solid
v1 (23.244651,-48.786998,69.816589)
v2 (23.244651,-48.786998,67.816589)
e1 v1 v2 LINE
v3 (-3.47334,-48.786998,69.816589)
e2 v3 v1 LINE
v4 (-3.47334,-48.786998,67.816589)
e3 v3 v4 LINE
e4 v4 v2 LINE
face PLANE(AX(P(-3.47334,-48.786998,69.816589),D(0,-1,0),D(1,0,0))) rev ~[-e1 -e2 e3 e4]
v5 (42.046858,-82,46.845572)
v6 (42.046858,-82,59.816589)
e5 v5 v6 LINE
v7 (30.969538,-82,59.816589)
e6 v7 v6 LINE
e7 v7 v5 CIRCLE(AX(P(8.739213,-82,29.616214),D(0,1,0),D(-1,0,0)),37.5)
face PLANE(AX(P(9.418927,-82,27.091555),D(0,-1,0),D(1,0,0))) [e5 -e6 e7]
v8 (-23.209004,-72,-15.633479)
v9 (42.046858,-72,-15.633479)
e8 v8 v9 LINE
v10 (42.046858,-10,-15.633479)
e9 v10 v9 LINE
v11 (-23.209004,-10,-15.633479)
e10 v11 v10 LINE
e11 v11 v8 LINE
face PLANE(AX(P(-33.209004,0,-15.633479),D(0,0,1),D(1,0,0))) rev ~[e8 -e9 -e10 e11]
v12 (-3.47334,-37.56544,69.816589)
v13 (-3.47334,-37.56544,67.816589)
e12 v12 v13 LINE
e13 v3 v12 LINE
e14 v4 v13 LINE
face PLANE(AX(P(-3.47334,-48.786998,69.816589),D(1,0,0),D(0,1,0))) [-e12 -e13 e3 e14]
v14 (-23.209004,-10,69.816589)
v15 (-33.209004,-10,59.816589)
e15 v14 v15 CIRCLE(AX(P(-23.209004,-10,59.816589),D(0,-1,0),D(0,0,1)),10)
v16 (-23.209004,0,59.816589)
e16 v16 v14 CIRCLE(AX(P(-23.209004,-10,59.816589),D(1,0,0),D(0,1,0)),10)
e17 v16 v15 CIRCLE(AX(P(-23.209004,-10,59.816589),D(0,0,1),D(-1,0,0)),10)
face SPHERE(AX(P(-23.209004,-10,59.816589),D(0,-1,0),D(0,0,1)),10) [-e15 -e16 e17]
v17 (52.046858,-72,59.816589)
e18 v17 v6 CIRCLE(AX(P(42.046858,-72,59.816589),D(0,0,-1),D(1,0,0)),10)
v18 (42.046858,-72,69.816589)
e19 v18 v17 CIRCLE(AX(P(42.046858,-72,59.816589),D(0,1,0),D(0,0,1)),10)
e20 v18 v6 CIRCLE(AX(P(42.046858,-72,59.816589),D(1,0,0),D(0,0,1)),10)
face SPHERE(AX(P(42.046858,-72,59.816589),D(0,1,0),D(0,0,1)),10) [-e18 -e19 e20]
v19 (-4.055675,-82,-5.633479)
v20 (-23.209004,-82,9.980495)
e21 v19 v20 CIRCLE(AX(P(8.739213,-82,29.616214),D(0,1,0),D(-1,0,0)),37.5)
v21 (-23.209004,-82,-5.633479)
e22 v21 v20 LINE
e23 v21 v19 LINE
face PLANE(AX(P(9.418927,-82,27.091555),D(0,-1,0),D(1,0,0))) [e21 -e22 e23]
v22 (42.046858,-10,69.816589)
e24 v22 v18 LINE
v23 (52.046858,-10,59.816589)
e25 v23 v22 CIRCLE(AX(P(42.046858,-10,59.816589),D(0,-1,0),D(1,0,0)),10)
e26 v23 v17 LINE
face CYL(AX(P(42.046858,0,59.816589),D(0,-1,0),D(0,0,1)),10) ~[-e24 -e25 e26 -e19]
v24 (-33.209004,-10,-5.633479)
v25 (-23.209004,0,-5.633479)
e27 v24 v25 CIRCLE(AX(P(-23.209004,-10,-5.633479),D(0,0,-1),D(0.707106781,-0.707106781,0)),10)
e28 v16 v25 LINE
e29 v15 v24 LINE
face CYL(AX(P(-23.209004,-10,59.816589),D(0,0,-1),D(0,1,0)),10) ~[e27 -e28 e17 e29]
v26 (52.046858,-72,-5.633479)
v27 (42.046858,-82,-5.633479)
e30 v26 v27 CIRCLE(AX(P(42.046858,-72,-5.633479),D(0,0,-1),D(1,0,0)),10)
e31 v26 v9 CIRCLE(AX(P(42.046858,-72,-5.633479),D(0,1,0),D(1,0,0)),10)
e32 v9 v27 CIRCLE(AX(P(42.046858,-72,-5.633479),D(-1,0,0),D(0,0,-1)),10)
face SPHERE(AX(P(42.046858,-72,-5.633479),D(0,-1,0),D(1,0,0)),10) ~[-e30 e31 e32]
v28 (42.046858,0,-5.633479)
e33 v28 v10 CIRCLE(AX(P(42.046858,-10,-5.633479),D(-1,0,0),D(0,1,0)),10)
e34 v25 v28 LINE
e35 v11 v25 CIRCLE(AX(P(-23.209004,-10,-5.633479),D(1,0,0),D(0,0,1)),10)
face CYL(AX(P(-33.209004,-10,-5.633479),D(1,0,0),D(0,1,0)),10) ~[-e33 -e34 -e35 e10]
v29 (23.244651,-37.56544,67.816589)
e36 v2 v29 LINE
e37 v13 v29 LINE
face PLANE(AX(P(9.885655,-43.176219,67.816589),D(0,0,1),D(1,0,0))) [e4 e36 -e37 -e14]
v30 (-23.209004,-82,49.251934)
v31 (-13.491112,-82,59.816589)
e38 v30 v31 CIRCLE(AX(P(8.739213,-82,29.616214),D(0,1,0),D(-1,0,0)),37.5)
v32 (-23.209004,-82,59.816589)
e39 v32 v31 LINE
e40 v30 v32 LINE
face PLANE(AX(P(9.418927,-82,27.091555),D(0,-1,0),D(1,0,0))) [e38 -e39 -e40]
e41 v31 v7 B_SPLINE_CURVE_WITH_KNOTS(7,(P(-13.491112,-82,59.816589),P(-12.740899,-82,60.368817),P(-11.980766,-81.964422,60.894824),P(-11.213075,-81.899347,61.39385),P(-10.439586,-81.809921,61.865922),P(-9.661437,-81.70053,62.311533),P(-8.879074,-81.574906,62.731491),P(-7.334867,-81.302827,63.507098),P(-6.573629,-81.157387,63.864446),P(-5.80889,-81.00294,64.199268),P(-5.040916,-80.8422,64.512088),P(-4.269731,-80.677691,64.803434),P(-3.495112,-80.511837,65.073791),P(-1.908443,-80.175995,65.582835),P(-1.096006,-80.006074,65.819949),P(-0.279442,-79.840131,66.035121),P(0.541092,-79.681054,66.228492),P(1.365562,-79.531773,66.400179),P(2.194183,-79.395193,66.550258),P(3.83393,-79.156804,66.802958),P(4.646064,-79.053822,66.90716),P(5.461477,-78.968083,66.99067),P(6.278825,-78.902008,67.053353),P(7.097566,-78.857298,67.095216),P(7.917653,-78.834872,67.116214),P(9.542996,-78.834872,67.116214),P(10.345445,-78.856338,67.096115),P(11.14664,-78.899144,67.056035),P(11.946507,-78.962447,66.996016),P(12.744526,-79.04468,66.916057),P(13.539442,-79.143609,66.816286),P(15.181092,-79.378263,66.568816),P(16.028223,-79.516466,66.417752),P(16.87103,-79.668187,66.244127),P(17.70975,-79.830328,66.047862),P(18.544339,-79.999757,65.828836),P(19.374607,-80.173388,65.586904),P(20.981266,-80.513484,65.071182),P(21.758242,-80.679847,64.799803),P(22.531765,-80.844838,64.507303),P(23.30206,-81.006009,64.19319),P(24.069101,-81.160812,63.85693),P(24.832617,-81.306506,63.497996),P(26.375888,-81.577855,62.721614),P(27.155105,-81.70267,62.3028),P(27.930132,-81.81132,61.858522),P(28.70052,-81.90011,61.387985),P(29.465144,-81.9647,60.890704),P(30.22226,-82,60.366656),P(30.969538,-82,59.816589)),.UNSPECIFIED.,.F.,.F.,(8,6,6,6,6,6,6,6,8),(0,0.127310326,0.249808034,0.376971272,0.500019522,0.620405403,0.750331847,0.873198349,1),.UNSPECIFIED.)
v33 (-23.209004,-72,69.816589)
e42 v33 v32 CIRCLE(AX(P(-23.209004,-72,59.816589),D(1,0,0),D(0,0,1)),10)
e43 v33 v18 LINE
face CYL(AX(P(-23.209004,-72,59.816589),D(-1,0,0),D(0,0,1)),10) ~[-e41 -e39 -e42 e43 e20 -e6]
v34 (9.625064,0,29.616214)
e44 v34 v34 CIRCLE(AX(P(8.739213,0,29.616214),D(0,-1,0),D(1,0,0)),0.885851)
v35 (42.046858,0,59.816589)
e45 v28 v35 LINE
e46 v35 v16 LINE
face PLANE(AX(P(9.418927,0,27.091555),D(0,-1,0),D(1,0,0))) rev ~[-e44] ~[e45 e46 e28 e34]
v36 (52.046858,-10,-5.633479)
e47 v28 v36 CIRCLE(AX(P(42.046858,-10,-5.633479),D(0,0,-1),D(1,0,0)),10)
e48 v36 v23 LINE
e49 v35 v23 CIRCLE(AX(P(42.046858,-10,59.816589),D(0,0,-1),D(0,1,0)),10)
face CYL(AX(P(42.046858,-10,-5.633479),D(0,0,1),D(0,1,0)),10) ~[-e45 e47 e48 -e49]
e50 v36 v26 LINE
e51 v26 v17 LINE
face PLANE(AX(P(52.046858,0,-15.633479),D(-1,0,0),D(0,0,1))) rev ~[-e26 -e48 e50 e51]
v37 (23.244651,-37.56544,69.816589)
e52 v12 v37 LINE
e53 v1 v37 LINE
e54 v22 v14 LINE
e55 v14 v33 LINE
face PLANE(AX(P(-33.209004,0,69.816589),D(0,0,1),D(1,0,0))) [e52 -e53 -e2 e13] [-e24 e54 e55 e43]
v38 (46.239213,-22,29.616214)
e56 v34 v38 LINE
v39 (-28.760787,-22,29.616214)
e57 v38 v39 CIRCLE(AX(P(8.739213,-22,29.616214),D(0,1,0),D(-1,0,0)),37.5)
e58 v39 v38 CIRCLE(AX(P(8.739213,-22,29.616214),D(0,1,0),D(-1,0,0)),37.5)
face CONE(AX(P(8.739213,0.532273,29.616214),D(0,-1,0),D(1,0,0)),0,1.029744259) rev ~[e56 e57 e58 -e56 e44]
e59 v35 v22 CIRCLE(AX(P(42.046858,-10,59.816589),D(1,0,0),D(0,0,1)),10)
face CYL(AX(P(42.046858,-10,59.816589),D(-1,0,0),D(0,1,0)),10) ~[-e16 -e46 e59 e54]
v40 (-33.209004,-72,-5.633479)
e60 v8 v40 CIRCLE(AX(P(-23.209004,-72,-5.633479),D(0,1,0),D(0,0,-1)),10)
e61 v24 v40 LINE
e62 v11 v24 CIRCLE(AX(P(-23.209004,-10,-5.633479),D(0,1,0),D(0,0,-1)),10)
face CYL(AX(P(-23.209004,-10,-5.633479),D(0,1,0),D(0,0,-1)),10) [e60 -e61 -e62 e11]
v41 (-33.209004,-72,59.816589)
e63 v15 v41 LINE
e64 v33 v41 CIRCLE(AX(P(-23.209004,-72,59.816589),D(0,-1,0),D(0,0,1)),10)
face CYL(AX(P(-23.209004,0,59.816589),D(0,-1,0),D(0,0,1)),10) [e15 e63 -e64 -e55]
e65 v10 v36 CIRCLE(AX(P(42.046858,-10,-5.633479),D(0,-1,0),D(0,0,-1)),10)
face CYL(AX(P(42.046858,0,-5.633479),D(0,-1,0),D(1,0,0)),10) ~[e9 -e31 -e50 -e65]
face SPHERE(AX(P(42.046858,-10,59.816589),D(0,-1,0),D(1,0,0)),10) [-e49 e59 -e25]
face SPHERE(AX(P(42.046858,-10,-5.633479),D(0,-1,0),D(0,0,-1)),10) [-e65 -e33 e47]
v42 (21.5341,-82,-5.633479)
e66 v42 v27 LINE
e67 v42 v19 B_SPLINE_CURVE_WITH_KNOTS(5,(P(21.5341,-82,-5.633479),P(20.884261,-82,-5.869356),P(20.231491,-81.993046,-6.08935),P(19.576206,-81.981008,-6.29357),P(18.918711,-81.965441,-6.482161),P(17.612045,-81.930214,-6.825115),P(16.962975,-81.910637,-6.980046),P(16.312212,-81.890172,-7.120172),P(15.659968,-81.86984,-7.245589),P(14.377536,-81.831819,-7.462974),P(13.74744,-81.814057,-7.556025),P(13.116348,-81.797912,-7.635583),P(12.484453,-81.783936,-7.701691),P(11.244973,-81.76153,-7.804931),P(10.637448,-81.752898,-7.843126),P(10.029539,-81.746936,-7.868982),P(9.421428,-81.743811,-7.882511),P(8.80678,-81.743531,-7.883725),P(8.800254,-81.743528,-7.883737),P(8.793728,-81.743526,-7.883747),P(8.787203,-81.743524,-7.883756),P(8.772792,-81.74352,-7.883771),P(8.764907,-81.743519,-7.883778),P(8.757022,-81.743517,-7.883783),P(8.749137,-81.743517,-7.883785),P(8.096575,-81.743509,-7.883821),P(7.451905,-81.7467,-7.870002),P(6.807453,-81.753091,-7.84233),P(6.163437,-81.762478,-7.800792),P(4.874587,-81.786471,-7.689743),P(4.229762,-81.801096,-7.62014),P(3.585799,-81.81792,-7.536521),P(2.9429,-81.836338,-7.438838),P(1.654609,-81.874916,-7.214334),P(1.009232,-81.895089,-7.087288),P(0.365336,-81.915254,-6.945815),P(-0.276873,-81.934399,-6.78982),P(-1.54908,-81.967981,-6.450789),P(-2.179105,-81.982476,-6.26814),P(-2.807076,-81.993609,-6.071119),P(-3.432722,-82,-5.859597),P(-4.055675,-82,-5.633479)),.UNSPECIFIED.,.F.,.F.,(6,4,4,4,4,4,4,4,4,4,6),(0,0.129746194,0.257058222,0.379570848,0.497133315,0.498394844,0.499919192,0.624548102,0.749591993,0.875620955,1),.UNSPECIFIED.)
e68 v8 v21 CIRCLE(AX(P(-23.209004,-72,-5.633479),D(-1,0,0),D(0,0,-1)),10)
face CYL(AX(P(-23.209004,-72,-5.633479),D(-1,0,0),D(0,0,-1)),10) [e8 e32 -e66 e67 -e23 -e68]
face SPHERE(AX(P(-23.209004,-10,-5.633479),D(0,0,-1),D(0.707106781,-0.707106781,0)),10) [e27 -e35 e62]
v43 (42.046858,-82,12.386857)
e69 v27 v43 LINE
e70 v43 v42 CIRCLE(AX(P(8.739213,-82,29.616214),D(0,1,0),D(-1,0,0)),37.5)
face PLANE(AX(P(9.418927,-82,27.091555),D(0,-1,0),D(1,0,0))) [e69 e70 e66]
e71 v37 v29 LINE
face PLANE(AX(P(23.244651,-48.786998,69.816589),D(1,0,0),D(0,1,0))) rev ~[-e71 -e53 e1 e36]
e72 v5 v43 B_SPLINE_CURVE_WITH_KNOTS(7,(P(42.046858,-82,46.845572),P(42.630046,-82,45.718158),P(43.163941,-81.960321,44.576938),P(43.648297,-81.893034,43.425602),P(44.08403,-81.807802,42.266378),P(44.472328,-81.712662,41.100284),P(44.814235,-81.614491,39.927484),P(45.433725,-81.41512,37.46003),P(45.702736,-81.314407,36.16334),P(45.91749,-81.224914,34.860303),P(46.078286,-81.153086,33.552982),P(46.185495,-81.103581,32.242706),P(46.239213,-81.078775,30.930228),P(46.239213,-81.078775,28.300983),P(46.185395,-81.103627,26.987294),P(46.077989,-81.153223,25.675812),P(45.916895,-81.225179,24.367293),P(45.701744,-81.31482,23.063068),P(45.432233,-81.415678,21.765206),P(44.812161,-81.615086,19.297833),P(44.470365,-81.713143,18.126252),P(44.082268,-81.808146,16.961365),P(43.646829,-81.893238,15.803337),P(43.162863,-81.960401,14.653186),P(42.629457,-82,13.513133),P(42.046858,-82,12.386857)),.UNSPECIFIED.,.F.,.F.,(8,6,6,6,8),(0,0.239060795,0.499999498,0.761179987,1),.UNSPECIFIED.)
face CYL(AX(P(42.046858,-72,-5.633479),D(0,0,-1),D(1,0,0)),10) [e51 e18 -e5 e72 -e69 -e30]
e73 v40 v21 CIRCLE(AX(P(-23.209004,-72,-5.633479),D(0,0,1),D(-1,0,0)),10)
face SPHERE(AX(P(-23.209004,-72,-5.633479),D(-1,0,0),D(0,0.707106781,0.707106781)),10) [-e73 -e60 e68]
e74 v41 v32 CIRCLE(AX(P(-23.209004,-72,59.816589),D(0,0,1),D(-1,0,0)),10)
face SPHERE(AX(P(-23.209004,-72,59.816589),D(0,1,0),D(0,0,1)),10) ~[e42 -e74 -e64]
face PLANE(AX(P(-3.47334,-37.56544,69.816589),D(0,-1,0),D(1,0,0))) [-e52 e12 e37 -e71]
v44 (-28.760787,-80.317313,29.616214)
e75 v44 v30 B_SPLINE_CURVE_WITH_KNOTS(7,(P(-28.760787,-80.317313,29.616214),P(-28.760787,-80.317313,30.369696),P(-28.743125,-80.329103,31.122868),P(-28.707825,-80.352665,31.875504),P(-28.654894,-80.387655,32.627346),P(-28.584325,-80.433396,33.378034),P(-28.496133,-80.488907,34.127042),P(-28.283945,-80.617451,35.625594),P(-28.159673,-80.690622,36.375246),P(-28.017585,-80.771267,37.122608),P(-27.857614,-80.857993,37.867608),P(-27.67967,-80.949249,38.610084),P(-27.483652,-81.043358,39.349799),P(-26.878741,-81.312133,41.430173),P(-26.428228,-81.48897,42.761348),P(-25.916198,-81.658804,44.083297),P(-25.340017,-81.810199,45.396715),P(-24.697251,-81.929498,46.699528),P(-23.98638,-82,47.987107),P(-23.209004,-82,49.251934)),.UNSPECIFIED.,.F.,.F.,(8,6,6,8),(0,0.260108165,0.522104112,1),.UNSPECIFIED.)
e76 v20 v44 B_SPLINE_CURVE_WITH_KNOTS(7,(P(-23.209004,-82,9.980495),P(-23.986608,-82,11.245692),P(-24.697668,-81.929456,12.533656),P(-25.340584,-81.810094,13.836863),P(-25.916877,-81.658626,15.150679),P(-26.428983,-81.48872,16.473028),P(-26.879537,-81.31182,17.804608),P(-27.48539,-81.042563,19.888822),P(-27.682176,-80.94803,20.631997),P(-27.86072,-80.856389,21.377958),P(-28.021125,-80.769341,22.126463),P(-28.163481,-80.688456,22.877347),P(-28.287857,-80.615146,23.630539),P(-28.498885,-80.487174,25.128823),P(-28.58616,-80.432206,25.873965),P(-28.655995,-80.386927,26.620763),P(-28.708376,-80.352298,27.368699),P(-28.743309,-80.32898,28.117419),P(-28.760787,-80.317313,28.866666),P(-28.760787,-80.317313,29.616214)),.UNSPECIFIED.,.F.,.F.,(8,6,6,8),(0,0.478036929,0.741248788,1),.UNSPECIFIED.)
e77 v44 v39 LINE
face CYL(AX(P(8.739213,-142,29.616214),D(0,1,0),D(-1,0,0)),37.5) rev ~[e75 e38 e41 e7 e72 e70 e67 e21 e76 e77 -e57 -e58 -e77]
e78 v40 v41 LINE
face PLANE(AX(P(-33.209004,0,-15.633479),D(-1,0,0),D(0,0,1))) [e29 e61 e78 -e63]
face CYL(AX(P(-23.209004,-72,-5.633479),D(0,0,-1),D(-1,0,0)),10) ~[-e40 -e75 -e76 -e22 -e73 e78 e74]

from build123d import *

# Parameters (mm, degrees)
F0_W         = 85.2558612823
F0_H         = 85.4500681162
F1_DEPTH     = 82
F3_D         = 75
F3_DEPTH     = 60
F3_TIP       = 22.5322732135
F4_R         = 10
F5_R         = 10
F6_R         = 10
F7_R         = 10
F8_T1_DEPTH  = 62
F8_T3_DEPTH  = 65.2558612823
F8_T5_DEPTH  = 65.4500681162
F8_S9_W      = 10
F8_S9_H      = 10
F8_T10_DEPTH = 10
F8_S15_W     = 10
F8_S15_H     = 10
F8_T16_DEPTH = 10
F8_T20_ANGLE = 90
F8_T22_ANGLE = 90
F8_T24_ANGLE = 90
F9_W         = 26.7179913353
F9_H         = 11.2215578556
F10_DEPTH    = 2


# Not quite as in the source:
# - a fillet or chamfer that OpenCascade refuses, or shapes differently, is made with other operations: its cross-section is extruded or revolved along the edge and cut away or added


with BuildPart() as f1:
    # F0 (on Front) → F1 (new body)
    with BuildSketch(Plane.XZ):
        with Locations((9.4189271331, 27.0915552974)):
            Rectangle(F0_W, F0_H)
    extrude(amount=F1_DEPTH)

    # F3
    with Locations(Plane.XZ.offset(82)):
        with Locations((8.7392125279, 29.616214335)):
            Hole(F3_D / 2, depth=F3_DEPTH)
            with Locations((0, 0, -(F3_DEPTH + F3_TIP / 2))):  # 118° drill point
                Cone(0, F3_D / 2, F3_TIP, mode=Mode.SUBTRACT)

    # F4
    f4_edges = [f1.edges().sort_by_distance(p)[0] for p in [
        (52.046858, -41, 69.816589),
    ]]
    fillet(f4_edges, radius=F4_R)

    # F5
    f5_edges = [f1.edges().sort_by_distance(p)[0] for p in [
        (-33.209004, -41, 69.816589),
    ]]
    fillet(f5_edges, radius=F5_R)

    # F6
    f6_edges = [f1.edges().sort_by_distance(p)[0] for p in [
        (52.046858, -41, -15.633479),
    ]]
    fillet(f6_edges, radius=F6_R)

    # F7
    f7_edges = [f1.edges().sort_by_distance(p)[0] for p in [
        (4.418927, 0, -15.633479),
    ]]
    fillet(f7_edges, radius=F7_R)

    # F8: fillet of radius 10 on 2 edges, made by hand

    # F8_s2 → F8_t1 (cut)
    with BuildSketch(Plane.XZ.offset(10)):
        with BuildLine():
            ThreePointArc((-23.2090035081, -15.6334787607), (-30.28007132, -12.7045465726), (-33.2090035081, -5.6334787607))
            Line((-33.2090035081, -5.6334787607), (-33.2090035081, -15.6334787607))
            Line((-33.2090035081, -15.6334787607), (-23.2090035081, -15.6334787607))
        make_face()
    extrude(amount=F8_T1_DEPTH, mode=Mode.SUBTRACT)

    # F8_s4 → F8_t3 (cut)
    with BuildSketch(Plane.YZ.offset(-23.2090035081)):
        with BuildLine():
            ThreePointArc((-72, 69.8165893555), (-79.0710678119, 66.8876571673), (-82, 59.8165893555))
            Line((-82, 59.8165893555), (-82, 69.8165893555))
            Line((-82, 69.8165893555), (-72, 69.8165893555))
        make_face()
        with BuildLine():
            ThreePointArc((-72, -15.6334787607), (-79.0710678119, -12.7045465726), (-82, -5.6334787607))
            Line((-82, -5.6334787607), (-82, -15.6334787607))
            Line((-82, -15.6334787607), (-72, -15.6334787607))
        make_face()
    extrude(amount=F8_T3_DEPTH, mode=Mode.SUBTRACT)

    # F8_s6 → F8_t5 (cut)
    with BuildSketch(Plane.XY.offset(-5.6334787607)):
        with BuildLine():
            ThreePointArc((-33.2090035081, -72), (-30.28007132, -79.0710678119), (-23.2090035081, -82))
            Line((-23.2090035081, -82), (-33.2090035081, -82))
            Line((-33.2090035081, -82), (-33.2090035081, -72))
        make_face()
        with BuildLine():
            ThreePointArc((52.0468577743, -72), (49.1179255861, -79.0710678119), (42.0468577743, -82))
            Line((42.0468577743, -82), (52.0468577743, -82))
            Line((52.0468577743, -82), (52.0468577743, -72))
        make_face()
    extrude(amount=F8_T5_DEPTH, mode=Mode.SUBTRACT)


with BuildPart() as f8_tool8:
    # F8_s9 → F8_t10 (new body)
    with BuildSketch(Plane.XY.offset(-5.6334787607)):
        with Locations((-28.2090035081, -5)):
            Rectangle(F8_S9_W, F8_S9_H)
    extrude(amount=-F8_T10_DEPTH)

    # F8_s11 → F8_t12 (revolve, cut)
    with BuildSketch(Plane(origin=(-23.2090035081, -10, -5.6334787607), x_dir=(0.7071067812, -0.7071067812, 0), z_dir=(0.7071067812, 0.7071067812, 0))):
        with BuildLine():
            ThreePointArc((0, -10), (10, 0), (0, 10))
            Line((0, 10), (0, -10))
        make_face()
    revolve(axis=Axis((-23.2090035081, -10, -5.6334787607), (0, 0, -1)), mode=Mode.SUBTRACT)


with BuildPart() as f1_1:
    add(f1.part)

    # F8_t7: cut F8_tool8
    add(f8_tool8.part, mode=Mode.SUBTRACT)


with BuildPart() as f8_tool14:
    # F8_s15 → F8_t16 (new body)
    with BuildSketch(Plane.YZ.offset(-23.2090035081)):
        with Locations((-77, -10.6334787607)):
            Rectangle(F8_S15_W, F8_S15_H)
    extrude(amount=-F8_T16_DEPTH)

    # F8_s17 → F8_t18 (revolve, cut)
    with BuildSketch(Plane(origin=(-23.2090035081, -72, -5.6334787607), x_dir=(0, 0.7071067812, 0.7071067812), z_dir=(0, -0.7071067812, 0.7071067812))):
        with BuildLine():
            ThreePointArc((0, -10), (10, 0), (0, 10))
            Line((0, 10), (0, -10))
        make_face()
    revolve(axis=Axis((-23.2090035081, -72, -5.6334787607), (-1, 0, 0)), mode=Mode.SUBTRACT)


with BuildPart() as f1_2:
    add(f1_1.part)

    # F8_t13: cut F8_tool14
    add(f8_tool14.part, mode=Mode.SUBTRACT)

    # F8_s19 → F8_t20 (revolve, cut)
    with BuildSketch(Plane.YZ.offset(42.0468577743)):
        with BuildLine():
            ThreePointArc((-82, 59.8165893555), (-79.0710678119, 66.8876571673), (-72, 69.8165893555))
            Line((-72, 69.8165893555), (-82, 69.8165893555))
            Line((-82, 69.8165893555), (-82, 59.8165893555))
        make_face()
    revolve(axis=Axis((42.0468577743, -82, 59.8165893555), (0, 1, 0)), revolution_arc=F8_T20_ANGLE, mode=Mode.SUBTRACT)

    # F8_s21 → F8_t22 (revolve, cut)
    with BuildSketch(Plane.YZ.offset(-23.2090035081)):
        with BuildLine():
            ThreePointArc((-82, 59.8165893555), (-79.0710678119, 66.8876571673), (-72, 69.8165893555))
            Line((-72, 69.8165893555), (-82, 69.8165893555))
            Line((-82, 69.8165893555), (-82, 59.8165893555))
        make_face()
    revolve(axis=Axis((-23.2090035081, -82, 59.8165893555), (0, -1, 0)), revolution_arc=F8_T22_ANGLE, mode=Mode.SUBTRACT)

    # F8_s23 → F8_t24 (revolve, cut)
    with BuildSketch(Plane.XY.offset(-5.6334787607)):
        with BuildLine():
            ThreePointArc((52.0468577743, -72), (49.1179255861, -79.0710678119), (42.0468577743, -82))
            Line((42.0468577743, -82), (52.0468577743, -82))
            Line((52.0468577743, -82), (52.0468577743, -72))
        make_face()
    revolve(axis=Axis((42.0468577743, -82, -5.6334787607), (0, 1, 0)), revolution_arc=F8_T24_ANGLE, mode=Mode.SUBTRACT)

    # F9 (on face) → F10 (cut)
    with BuildSketch(Plane.XY.offset(69.8165893555)):
        with Locations((9.8856553668, -43.1762188673)):
            Rectangle(F9_W, F9_H)
    extrude(amount=-F10_DEPTH, mode=Mode.SUBTRACT)


solid = f1_2.part
